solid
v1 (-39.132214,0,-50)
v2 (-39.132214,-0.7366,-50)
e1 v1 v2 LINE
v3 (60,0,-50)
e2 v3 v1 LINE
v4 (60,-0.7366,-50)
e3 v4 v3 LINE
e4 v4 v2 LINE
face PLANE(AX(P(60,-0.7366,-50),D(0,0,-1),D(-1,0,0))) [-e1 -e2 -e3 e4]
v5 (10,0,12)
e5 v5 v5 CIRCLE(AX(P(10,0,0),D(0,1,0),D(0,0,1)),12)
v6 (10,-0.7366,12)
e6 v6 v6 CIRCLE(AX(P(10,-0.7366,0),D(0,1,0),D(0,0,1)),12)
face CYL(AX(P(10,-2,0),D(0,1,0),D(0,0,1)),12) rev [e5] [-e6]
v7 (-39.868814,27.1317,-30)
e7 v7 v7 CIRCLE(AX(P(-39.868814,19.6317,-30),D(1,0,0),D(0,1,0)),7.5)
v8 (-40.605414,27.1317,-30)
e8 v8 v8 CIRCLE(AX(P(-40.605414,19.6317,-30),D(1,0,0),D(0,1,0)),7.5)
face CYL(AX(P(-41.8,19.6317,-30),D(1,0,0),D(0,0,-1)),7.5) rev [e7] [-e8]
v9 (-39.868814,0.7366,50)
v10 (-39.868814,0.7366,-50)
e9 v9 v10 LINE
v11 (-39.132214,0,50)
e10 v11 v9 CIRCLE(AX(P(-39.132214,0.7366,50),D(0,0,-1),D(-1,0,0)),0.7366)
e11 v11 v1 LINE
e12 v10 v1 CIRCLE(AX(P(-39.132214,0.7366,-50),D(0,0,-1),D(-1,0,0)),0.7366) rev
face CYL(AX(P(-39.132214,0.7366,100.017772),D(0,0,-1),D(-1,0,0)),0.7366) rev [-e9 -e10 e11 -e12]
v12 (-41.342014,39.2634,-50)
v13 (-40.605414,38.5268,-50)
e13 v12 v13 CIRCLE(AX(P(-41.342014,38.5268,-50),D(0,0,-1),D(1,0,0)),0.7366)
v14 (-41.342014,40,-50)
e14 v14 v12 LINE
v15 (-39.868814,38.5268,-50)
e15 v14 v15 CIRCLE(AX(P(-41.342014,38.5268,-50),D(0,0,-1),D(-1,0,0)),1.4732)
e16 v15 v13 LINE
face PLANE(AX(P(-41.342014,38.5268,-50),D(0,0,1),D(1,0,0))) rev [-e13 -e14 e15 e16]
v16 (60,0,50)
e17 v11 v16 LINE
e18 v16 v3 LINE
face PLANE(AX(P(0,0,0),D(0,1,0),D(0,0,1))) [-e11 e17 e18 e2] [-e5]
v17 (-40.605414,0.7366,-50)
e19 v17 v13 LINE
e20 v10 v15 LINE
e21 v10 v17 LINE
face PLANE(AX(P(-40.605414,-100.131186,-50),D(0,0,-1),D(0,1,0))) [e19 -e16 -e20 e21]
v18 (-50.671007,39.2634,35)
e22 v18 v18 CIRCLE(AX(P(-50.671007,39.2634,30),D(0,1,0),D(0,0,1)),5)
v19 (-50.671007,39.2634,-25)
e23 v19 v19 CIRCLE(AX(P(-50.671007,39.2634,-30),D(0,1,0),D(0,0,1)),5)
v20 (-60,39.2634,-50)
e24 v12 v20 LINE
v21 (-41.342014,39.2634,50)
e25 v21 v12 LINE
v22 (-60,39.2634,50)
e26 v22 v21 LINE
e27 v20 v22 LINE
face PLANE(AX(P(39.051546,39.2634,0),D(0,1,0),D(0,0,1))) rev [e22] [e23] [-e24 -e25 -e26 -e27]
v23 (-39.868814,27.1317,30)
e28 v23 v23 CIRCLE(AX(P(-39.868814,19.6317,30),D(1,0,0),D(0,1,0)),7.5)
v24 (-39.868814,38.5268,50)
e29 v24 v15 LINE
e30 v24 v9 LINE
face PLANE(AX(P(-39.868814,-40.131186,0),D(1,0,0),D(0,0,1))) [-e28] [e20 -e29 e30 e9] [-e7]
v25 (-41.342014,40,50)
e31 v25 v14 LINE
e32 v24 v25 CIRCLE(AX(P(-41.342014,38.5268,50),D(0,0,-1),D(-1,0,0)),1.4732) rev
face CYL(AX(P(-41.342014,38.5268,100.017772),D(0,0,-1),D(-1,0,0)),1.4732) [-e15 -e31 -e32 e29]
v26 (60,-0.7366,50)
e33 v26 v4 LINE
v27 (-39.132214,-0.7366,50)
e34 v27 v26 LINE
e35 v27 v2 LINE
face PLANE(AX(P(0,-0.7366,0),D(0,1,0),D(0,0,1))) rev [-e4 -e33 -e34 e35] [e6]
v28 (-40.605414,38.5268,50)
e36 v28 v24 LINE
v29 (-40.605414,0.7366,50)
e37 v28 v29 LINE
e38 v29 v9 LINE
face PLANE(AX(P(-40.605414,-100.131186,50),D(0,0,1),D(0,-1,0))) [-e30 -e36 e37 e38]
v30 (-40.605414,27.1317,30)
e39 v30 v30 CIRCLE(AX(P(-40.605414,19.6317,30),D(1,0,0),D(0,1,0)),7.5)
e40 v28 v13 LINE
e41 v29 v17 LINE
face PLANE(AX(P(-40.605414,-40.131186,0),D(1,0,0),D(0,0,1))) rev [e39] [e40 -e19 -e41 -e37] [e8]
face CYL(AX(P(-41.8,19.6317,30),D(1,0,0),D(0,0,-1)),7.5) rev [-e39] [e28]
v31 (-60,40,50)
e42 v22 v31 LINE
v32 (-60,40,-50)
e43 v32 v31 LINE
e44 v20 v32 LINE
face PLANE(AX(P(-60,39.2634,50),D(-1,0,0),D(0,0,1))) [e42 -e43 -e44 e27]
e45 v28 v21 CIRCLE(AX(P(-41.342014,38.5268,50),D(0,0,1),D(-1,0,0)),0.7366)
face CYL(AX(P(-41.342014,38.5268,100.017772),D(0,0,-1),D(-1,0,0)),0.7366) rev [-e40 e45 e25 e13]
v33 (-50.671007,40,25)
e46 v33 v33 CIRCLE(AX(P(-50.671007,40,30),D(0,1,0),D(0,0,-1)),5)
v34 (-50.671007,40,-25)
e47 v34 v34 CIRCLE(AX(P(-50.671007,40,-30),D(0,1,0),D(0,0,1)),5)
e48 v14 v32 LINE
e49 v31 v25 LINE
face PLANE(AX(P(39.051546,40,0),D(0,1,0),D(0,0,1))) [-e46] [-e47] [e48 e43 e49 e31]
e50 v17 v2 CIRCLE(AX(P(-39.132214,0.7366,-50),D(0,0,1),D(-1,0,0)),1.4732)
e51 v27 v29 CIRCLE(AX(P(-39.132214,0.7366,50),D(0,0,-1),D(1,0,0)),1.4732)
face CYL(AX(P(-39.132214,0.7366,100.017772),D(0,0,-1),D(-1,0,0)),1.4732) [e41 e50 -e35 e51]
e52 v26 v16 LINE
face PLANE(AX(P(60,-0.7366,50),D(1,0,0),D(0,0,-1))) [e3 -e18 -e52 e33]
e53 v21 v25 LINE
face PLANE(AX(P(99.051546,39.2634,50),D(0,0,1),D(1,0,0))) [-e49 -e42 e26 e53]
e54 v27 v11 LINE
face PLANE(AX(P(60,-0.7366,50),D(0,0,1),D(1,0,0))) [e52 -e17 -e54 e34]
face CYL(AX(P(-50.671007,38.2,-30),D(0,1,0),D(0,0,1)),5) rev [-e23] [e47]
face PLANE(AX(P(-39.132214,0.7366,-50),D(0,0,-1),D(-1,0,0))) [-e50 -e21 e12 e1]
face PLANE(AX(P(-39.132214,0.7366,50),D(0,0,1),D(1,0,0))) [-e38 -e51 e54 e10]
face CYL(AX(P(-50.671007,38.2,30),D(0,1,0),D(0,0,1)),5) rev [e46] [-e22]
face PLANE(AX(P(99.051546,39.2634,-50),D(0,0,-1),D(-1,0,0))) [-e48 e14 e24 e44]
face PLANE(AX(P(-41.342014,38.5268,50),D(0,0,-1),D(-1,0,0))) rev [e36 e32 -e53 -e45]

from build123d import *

# Parameters (mm, degrees)
SKETCH5_W               = 120
SKETCH5_H               = 100
BASE_FLANGE1_DEPTH      = 0.7366
JOG1_START              = -50
JOG1_DEPTH              = 100
JOG1_2_DEPTH            = 100
SKETCH15_R              = 12
CUT_EXTRUDE1_DEPTH      = 2
SKETCH21_R              = 5
CUT_EXTRUDE3_DEPTH      = 1.8
CUT_EXTRUDE4_DEPTH      = 2
CUT_EXTRUDE4_DEPTH_BACK = 1.8
SKETCH22_R              = 7.5


# Read off the part's stored shape, not the designer's step: Jog1
# Sheet-metal steps are written as plain solids
with BuildPart() as part:
    # Sketch5 → Base-Flange1 (new body)
    with BuildSketch(Plane(origin=(0, 0, 0), x_dir=(1, 0, 0), z_dir=(0, 1, 0))):
        Rectangle(SKETCH5_W, SKETCH5_H)
    extrude(amount=-BASE_FLANGE1_DEPTH)

    # Jog1 outline → Jog1 (cut)
    with BuildSketch(Plane.XY.offset(JOG1_START)):
        with BuildLine():
            ThreePointArc((-39.132213569, -0.7366), (-39.868813569, -0.539228625), (-40.408042194, 0))
            Line((-40.408042194, 0), (-60, 0))
            Line((-60, 0), (-60, -0.7366))
            Line((-60, -0.7366), (-39.132213569, -0.7366))
        make_face()
    extrude(amount=JOG1_DEPTH, mode=Mode.SUBTRACT)

    # Jog1 2 outline → Jog1 2 (add)
    with BuildSketch(Plane.XY.offset(JOG1_START)):
        with BuildLine():
            Line((-40.605413569, 38.5268), (-40.605413569, 0.7366))
            ThreePointArc((-40.605413569, 0.7366), (-40.555215496, 0.355307783), (-40.408042194, 0))
            Line((-40.408042194, 0), (-39.132213569, 0))
            ThreePointArc((-39.132213569, 0), (-39.653068424, 0.215745145), (-39.868813569, 0.7366))
            Line((-39.868813569, 0.7366), (-39.868813569, 38.5268))
            ThreePointArc((-39.868813569, 38.5268), (-40.300303859, 39.56850971), (-41.342013569, 40))
            Line((-41.342013569, 40), (-60, 40))
            Line((-60, 40), (-60, 39.2634))
            Line((-60, 39.2634), (-41.342013569, 39.2634))
            ThreePointArc((-41.342013569, 39.2634), (-40.821158714, 39.047654855), (-40.605413569, 38.5268))
        make_face()
    extrude(amount=JOG1_2_DEPTH)

    # Sketch15 → Cut-Extrude1 (cut)
    with BuildSketch(Plane(origin=(0, 0, 0), x_dir=(1, 0, 0), z_dir=(0, 1, 0))):
        with Locations(Location((10, 0, 0), (0, 0, 270))):
            Circle(SKETCH15_R)
    extrude(amount=-CUT_EXTRUDE1_DEPTH, mode=Mode.SUBTRACT)

    # Sketch21 → Cut-Extrude3 (cut)
    with BuildSketch(Plane(origin=(0, 40, 0), x_dir=(1, 0, 0), z_dir=(0, 1, 0))):
        with Locations(Location((-50.671006785, 30, 0), (0, 0, 270))):
            Circle(SKETCH21_R)
        with Locations(Location((-50.671006785, -30, 0), (0, 0, 270))):
            Circle(SKETCH21_R)
    extrude(amount=-CUT_EXTRUDE3_DEPTH, mode=Mode.SUBTRACT)

    # Sketch22 → Cut-Extrude4 (cut, two sides: drawn at the far end of the back side and taken through both)
    with BuildSketch(Plane(origin=(-40, 0, 0), x_dir=(0, 0, -1), z_dir=(1, 0, 0)).offset(-CUT_EXTRUDE4_DEPTH_BACK)):
        with Locations(Location((30, 19.6317, 0), (0, 0, 90))):
            Circle(SKETCH22_R)
        with Locations(Location((-30, 19.6317, 0), (0, 0, 90))):
            Circle(SKETCH22_R)
    extrude(amount=CUT_EXTRUDE4_DEPTH + CUT_EXTRUDE4_DEPTH_BACK, mode=Mode.SUBTRACT)


solid = part.part
